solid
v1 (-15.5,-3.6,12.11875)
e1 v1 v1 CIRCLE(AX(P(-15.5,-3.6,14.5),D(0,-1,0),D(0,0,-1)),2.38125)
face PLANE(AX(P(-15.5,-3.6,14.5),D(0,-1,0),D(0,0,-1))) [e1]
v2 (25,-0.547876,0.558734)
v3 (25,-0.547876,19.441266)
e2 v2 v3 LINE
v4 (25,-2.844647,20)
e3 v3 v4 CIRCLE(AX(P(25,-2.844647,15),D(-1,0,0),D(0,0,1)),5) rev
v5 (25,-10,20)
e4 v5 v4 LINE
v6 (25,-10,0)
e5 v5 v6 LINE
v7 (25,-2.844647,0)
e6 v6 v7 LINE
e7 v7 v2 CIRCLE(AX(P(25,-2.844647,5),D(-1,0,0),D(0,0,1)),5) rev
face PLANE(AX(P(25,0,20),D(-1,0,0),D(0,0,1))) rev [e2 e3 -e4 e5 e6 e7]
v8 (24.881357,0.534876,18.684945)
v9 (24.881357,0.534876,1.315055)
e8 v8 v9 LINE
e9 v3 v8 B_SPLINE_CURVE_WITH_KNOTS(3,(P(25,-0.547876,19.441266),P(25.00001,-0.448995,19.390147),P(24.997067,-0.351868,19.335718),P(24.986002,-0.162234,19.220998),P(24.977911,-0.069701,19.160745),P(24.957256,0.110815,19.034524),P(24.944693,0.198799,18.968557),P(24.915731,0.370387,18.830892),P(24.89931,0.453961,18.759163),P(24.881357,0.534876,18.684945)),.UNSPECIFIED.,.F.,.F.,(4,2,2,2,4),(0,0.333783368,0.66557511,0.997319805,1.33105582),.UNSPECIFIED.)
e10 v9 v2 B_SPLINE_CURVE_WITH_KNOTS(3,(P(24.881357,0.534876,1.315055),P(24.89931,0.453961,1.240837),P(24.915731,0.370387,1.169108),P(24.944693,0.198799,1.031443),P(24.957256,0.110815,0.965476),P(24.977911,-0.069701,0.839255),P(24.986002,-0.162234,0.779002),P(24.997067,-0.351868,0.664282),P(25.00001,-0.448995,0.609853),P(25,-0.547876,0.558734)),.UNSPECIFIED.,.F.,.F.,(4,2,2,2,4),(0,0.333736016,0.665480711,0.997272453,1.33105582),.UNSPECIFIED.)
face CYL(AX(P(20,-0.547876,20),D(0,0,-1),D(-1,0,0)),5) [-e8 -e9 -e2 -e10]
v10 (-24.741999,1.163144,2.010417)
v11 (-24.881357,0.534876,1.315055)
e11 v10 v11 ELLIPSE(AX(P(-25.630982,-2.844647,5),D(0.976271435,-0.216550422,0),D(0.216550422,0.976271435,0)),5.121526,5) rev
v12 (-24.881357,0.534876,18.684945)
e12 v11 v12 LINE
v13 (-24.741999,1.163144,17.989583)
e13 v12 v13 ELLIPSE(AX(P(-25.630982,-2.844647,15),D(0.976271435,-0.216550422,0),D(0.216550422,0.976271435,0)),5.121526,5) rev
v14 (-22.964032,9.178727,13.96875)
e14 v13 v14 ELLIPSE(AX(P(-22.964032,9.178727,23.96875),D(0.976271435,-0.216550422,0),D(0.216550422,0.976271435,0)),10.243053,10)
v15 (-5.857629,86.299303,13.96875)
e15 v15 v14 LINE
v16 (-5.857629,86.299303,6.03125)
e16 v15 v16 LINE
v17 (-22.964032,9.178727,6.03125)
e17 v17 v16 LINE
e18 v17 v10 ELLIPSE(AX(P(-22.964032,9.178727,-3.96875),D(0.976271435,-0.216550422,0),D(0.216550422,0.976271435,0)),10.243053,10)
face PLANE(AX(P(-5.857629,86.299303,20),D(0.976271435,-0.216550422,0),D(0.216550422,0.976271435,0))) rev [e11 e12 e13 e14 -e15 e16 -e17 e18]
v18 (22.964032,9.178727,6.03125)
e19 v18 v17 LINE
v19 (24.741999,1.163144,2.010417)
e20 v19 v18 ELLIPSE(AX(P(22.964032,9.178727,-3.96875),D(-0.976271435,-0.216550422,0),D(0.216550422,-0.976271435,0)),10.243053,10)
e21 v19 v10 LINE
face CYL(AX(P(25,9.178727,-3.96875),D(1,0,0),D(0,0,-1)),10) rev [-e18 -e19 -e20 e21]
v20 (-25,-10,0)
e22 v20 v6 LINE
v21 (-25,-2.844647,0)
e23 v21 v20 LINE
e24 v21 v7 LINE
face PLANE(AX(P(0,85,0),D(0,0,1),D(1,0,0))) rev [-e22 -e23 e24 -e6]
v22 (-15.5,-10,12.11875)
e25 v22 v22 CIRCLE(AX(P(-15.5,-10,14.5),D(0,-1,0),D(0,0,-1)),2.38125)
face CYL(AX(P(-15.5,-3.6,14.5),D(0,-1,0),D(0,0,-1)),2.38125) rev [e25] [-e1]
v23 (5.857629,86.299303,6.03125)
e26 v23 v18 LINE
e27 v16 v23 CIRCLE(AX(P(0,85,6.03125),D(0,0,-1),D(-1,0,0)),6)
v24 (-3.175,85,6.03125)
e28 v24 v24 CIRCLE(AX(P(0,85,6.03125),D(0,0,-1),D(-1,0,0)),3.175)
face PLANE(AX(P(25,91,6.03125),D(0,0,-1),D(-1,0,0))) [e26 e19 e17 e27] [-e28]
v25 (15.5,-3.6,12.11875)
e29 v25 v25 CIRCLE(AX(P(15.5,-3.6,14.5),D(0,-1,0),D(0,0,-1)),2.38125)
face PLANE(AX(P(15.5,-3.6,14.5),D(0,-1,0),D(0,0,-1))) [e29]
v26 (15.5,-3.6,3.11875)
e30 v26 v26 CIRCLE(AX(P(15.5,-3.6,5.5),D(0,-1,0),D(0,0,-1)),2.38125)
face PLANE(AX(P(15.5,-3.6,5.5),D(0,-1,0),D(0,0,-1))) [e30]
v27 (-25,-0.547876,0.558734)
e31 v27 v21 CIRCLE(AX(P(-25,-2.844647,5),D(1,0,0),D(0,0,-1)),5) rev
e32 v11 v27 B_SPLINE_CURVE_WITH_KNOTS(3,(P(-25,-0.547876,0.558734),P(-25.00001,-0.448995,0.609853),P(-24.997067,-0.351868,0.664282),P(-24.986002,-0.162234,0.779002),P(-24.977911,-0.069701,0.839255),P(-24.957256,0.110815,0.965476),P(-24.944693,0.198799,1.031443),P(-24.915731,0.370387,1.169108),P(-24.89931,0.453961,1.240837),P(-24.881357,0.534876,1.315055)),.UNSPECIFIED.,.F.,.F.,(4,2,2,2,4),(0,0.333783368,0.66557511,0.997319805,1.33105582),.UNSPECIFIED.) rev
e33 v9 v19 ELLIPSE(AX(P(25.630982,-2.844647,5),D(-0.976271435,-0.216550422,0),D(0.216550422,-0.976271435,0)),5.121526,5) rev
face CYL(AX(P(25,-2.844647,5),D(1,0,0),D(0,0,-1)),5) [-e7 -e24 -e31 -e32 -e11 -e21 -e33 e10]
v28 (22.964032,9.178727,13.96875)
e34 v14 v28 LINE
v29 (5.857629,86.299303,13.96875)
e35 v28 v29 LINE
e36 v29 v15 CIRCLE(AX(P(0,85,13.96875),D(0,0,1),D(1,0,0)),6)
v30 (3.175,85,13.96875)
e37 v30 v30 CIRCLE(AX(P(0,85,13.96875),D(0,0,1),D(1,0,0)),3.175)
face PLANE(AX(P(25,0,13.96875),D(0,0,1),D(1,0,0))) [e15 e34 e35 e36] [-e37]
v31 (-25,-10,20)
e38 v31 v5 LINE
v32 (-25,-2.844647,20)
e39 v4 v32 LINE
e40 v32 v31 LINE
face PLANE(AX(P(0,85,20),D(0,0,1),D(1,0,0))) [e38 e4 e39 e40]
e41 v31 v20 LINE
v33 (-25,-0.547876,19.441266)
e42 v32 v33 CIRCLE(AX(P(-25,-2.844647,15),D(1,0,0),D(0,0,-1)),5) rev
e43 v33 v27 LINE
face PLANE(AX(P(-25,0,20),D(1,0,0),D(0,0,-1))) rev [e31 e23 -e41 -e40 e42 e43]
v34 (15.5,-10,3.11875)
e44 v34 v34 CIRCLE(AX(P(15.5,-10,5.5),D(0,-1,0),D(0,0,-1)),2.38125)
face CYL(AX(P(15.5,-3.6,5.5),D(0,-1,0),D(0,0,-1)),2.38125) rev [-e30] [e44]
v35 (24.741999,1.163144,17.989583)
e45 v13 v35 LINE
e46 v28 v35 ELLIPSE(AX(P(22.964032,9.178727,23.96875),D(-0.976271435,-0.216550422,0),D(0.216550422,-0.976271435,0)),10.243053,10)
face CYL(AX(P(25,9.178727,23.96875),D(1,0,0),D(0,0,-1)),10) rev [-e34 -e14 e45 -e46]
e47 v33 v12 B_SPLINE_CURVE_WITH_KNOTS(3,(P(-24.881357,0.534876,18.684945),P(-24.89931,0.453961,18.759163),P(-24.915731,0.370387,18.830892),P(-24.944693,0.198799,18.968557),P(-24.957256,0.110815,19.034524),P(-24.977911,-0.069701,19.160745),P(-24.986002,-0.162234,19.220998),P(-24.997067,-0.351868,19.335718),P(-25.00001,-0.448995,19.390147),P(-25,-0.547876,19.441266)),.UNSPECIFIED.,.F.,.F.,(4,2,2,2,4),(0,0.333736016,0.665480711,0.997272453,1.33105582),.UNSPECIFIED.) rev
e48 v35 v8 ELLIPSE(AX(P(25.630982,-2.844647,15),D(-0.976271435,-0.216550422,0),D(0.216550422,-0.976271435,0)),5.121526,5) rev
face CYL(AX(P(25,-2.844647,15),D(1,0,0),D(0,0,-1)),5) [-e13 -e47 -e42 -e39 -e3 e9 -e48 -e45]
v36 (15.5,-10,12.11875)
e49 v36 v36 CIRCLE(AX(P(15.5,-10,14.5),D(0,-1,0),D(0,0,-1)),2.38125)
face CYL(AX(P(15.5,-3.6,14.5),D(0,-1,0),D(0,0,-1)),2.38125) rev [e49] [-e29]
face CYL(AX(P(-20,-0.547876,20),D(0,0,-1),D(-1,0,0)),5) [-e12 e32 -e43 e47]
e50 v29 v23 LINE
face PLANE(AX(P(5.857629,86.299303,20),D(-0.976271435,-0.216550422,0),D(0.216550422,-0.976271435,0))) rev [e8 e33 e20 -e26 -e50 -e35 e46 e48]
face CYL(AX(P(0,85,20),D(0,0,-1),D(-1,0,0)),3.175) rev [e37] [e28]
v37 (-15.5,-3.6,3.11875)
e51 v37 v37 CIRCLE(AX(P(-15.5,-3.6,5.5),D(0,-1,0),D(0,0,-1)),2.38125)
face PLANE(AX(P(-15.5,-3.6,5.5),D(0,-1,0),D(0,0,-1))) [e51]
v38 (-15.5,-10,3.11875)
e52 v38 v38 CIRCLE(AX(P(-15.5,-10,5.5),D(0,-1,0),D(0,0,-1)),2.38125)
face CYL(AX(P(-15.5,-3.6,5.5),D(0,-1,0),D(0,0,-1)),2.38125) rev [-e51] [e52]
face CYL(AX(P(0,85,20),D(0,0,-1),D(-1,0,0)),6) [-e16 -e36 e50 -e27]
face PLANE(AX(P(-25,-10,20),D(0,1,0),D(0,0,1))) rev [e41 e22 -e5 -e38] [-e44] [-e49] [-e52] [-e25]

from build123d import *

# Parameters (mm, degrees)
SKETCH1_R               = 3.175
BOSS_EXTRUDE1_DEPTH     = 20
CUT_EXTRUDE1_DEPTH      = 25
CUT_EXTRUDE1_DEPTH_BACK = 25
SKETCH2_W               = 6.03125
SKETCH2_H               = 91
FILLET1_R               = 10
FILLET2_R               = 5
SKETCH3_R               = 2.38125
CUT_EXTRUDE2_DEPTH      = 6.4


with BuildPart() as part:
    # Sketch1 → Boss-Extrude1 (new body)
    with BuildSketch(Plane.XY):
        with BuildLine():
            Line((-5.85762861, 86.299302532), (-25, 0))
            Line((-25, 0), (-25, -10))
            Line((-25, -10), (25, -10))
            Line((25, -10), (25, 0))
            Line((25, 0), (5.85762861, 86.299302532))
            ThreePointArc((5.85762861, 86.299302532), (0, 91), (-5.85762861, 86.299302532))
        make_face()
        with Locations((0, 85)):
            Circle(SKETCH1_R, mode=Mode.SUBTRACT)
    extrude(amount=BOSS_EXTRUDE1_DEPTH)

    # Sketch2 → Cut-Extrude1 (cut, two sides: drawn at the far end of the back side and taken through both)
    with BuildSketch(Plane(origin=(0, 0, 0), x_dir=(0, 0, -1), z_dir=(1, 0, 0)).offset(-CUT_EXTRUDE1_DEPTH_BACK)):
        with Locations((-16.984375, 45.5)):
            Rectangle(SKETCH2_W, SKETCH2_H)
        with Locations((-3.015625, 45.5)):
            Rectangle(SKETCH2_W, SKETCH2_H)
    extrude(amount=CUT_EXTRUDE1_DEPTH + CUT_EXTRUDE1_DEPTH_BACK, mode=Mode.SUBTRACT)

    # Fillet1
    # the kernel refuses this fillet: 10 mm, written as the material it adds along each edge
    with BuildSketch(Plane(origin=(-25, 0, 13.96875), x_dir=(0, 1, 0), z_dir=(1, 0, 0))) as fillet1_piece_1_section:
        with BuildLine():
            CenterArc((9.178726678, 10), FILLET1_R, 203.382964427, 66.617035573)
            Line((0, 6.03125), (-0.183574534, 5.951875))
            ThreePointArc((-0.183574534, 5.951875), (-0.2, 3.015625), (-0.2, 0))
            Line((-0.2, 0), (0, -0.2))
            Line((0, -0.2), (9.178726678, -0.2))
            Line((9.178726678, -0.2), (9.178726678, 0))
        make_face()
    fillet1_piece_1 = extrude(amount=50, mode=Mode.PRIVATE)
    fillet1_piece_1 = split(fillet1_piece_1, bisect_by=Plane(origin=(23.363313282, 7.378653319, 15.543546825), z_dir=(-0.9762714349563381, -0.2165504220459817, 0)), keep=Keep.TOP, mode=Mode.PRIVATE)
    fillet1_piece_1 = split(fillet1_piece_1, bisect_by=Plane(origin=(-23.363313282, 7.378653319, 15.543546825), z_dir=(0.9762714349563381, -0.2165504220459817, 0)), keep=Keep.TOP, mode=Mode.PRIVATE)
    add(fillet1_piece_1)
    with BuildSketch(Plane(origin=(25, 0, 6.03125), x_dir=(0, 1, 0), z_dir=(-1, 0, 0))) as fillet1_piece_2_section:
        with BuildLine():
            CenterArc((9.178726678, 10), FILLET1_R, 203.382964427, 66.617035573)
            Line((0, 6.03125), (-0.183574534, 5.951875))
            ThreePointArc((-0.183574534, 5.951875), (-0.2, 3.015625), (-0.2, 0))
            Line((-0.2, 0), (0, -0.2))
            Line((0, -0.2), (9.178726678, -0.2))
            Line((9.178726678, -0.2), (9.178726678, 0))
        make_face()
    fillet1_piece_2 = extrude(amount=50, mode=Mode.PRIVATE)
    fillet1_piece_2 = split(fillet1_piece_2, bisect_by=Plane(origin=(23.363313282, 7.378653319, 4.456453175), z_dir=(-0.9762714349563381, -0.2165504220459817, 0)), keep=Keep.TOP, mode=Mode.PRIVATE)
    fillet1_piece_2 = split(fillet1_piece_2, bisect_by=Plane(origin=(-23.363313282, 7.378653319, 4.456453175), z_dir=(0.9762714349563381, -0.2165504220459817, 0)), keep=Keep.TOP, mode=Mode.PRIVATE)
    add(fillet1_piece_2)

    # Fillet2
    # the kernel refuses this fillet: 5 mm, written as the material it takes off along each edge
    with BuildSketch(Plane(origin=(-25, 0, -1.369690533), x_dir=(0, -1, 0), z_dir=(0, 0, 1)), Plane(origin=(25, 0, 21.369690533), x_dir=(0, -1, 0), z_dir=(0, 0, -1))) as fillet2_piece_1:
        with BuildLine():
            CenterArc((FILLET2_R * 0.109575242659, FILLET2_R), FILLET2_R, 257.493496935, 12.506503065)
            Line((-FILLET2_R * 0.106975179387, FILLET2_R * 0.0237285650437), (0, 0))
            Line((0, 0), (FILLET2_R * 0.109575242659, 0))
        make_face()
    extrude(amount=22.739381066, mode=Mode.SUBTRACT)
    with BuildSketch(Plane(origin=(32.111618418, 0, 0), x_dir=(0, 0.5007842597579724, 0.8655721374782461), z_dir=(-1, 0, 0))) as fillet2_piece_2:
        with BuildLine():
            CenterArc((2.903306061, -4.966168801), FILLET2_R, 96.668935359, 53.279164854)
            Line((-1.424554626, -2.462247502), (0, 0))
            ThreePointArc((0, 0), (1.161322425, -0.067662399), (2.322644849, 0))
        make_face()
    extrude(amount=64.223236835, mode=Mode.SUBTRACT)
    with BuildSketch(Plane(origin=(32.111618418, 0, 20), x_dir=(0, -1, 0), z_dir=(-1, 0, 0))) as fillet2_piece_3:
        with BuildLine():
            CenterArc((2.844647367, -5), FILLET2_R, 90, 53.279164854)
            ThreePointArc((-1.163143981, -2.010416667), (-0.523005304, -1.039092598), (0, 0))
            Line((0, 0), (2.844647367, 0))
        make_face()
    extrude(amount=64.223236835, mode=Mode.SUBTRACT)

    # Sketch3 → Cut-Extrude2 (cut)
    with BuildSketch(Plane.XZ.offset(10)):
        with Locations(Location((-15.5, 14.5, 0), (0, 0, 270))):
            Circle(SKETCH3_R)
        with Locations(Location((-15.5, 5.5, 0), (0, 0, 270))):
            Circle(SKETCH3_R)
        with Locations(Location((15.5, 14.5, 0), (0, 0, 270))):
            Circle(SKETCH3_R)
        with Locations(Location((15.5, 5.5, 0), (0, 0, 270))):
            Circle(SKETCH3_R)
    extrude(amount=-CUT_EXTRUDE2_DEPTH, mode=Mode.SUBTRACT)


solid = part.part
